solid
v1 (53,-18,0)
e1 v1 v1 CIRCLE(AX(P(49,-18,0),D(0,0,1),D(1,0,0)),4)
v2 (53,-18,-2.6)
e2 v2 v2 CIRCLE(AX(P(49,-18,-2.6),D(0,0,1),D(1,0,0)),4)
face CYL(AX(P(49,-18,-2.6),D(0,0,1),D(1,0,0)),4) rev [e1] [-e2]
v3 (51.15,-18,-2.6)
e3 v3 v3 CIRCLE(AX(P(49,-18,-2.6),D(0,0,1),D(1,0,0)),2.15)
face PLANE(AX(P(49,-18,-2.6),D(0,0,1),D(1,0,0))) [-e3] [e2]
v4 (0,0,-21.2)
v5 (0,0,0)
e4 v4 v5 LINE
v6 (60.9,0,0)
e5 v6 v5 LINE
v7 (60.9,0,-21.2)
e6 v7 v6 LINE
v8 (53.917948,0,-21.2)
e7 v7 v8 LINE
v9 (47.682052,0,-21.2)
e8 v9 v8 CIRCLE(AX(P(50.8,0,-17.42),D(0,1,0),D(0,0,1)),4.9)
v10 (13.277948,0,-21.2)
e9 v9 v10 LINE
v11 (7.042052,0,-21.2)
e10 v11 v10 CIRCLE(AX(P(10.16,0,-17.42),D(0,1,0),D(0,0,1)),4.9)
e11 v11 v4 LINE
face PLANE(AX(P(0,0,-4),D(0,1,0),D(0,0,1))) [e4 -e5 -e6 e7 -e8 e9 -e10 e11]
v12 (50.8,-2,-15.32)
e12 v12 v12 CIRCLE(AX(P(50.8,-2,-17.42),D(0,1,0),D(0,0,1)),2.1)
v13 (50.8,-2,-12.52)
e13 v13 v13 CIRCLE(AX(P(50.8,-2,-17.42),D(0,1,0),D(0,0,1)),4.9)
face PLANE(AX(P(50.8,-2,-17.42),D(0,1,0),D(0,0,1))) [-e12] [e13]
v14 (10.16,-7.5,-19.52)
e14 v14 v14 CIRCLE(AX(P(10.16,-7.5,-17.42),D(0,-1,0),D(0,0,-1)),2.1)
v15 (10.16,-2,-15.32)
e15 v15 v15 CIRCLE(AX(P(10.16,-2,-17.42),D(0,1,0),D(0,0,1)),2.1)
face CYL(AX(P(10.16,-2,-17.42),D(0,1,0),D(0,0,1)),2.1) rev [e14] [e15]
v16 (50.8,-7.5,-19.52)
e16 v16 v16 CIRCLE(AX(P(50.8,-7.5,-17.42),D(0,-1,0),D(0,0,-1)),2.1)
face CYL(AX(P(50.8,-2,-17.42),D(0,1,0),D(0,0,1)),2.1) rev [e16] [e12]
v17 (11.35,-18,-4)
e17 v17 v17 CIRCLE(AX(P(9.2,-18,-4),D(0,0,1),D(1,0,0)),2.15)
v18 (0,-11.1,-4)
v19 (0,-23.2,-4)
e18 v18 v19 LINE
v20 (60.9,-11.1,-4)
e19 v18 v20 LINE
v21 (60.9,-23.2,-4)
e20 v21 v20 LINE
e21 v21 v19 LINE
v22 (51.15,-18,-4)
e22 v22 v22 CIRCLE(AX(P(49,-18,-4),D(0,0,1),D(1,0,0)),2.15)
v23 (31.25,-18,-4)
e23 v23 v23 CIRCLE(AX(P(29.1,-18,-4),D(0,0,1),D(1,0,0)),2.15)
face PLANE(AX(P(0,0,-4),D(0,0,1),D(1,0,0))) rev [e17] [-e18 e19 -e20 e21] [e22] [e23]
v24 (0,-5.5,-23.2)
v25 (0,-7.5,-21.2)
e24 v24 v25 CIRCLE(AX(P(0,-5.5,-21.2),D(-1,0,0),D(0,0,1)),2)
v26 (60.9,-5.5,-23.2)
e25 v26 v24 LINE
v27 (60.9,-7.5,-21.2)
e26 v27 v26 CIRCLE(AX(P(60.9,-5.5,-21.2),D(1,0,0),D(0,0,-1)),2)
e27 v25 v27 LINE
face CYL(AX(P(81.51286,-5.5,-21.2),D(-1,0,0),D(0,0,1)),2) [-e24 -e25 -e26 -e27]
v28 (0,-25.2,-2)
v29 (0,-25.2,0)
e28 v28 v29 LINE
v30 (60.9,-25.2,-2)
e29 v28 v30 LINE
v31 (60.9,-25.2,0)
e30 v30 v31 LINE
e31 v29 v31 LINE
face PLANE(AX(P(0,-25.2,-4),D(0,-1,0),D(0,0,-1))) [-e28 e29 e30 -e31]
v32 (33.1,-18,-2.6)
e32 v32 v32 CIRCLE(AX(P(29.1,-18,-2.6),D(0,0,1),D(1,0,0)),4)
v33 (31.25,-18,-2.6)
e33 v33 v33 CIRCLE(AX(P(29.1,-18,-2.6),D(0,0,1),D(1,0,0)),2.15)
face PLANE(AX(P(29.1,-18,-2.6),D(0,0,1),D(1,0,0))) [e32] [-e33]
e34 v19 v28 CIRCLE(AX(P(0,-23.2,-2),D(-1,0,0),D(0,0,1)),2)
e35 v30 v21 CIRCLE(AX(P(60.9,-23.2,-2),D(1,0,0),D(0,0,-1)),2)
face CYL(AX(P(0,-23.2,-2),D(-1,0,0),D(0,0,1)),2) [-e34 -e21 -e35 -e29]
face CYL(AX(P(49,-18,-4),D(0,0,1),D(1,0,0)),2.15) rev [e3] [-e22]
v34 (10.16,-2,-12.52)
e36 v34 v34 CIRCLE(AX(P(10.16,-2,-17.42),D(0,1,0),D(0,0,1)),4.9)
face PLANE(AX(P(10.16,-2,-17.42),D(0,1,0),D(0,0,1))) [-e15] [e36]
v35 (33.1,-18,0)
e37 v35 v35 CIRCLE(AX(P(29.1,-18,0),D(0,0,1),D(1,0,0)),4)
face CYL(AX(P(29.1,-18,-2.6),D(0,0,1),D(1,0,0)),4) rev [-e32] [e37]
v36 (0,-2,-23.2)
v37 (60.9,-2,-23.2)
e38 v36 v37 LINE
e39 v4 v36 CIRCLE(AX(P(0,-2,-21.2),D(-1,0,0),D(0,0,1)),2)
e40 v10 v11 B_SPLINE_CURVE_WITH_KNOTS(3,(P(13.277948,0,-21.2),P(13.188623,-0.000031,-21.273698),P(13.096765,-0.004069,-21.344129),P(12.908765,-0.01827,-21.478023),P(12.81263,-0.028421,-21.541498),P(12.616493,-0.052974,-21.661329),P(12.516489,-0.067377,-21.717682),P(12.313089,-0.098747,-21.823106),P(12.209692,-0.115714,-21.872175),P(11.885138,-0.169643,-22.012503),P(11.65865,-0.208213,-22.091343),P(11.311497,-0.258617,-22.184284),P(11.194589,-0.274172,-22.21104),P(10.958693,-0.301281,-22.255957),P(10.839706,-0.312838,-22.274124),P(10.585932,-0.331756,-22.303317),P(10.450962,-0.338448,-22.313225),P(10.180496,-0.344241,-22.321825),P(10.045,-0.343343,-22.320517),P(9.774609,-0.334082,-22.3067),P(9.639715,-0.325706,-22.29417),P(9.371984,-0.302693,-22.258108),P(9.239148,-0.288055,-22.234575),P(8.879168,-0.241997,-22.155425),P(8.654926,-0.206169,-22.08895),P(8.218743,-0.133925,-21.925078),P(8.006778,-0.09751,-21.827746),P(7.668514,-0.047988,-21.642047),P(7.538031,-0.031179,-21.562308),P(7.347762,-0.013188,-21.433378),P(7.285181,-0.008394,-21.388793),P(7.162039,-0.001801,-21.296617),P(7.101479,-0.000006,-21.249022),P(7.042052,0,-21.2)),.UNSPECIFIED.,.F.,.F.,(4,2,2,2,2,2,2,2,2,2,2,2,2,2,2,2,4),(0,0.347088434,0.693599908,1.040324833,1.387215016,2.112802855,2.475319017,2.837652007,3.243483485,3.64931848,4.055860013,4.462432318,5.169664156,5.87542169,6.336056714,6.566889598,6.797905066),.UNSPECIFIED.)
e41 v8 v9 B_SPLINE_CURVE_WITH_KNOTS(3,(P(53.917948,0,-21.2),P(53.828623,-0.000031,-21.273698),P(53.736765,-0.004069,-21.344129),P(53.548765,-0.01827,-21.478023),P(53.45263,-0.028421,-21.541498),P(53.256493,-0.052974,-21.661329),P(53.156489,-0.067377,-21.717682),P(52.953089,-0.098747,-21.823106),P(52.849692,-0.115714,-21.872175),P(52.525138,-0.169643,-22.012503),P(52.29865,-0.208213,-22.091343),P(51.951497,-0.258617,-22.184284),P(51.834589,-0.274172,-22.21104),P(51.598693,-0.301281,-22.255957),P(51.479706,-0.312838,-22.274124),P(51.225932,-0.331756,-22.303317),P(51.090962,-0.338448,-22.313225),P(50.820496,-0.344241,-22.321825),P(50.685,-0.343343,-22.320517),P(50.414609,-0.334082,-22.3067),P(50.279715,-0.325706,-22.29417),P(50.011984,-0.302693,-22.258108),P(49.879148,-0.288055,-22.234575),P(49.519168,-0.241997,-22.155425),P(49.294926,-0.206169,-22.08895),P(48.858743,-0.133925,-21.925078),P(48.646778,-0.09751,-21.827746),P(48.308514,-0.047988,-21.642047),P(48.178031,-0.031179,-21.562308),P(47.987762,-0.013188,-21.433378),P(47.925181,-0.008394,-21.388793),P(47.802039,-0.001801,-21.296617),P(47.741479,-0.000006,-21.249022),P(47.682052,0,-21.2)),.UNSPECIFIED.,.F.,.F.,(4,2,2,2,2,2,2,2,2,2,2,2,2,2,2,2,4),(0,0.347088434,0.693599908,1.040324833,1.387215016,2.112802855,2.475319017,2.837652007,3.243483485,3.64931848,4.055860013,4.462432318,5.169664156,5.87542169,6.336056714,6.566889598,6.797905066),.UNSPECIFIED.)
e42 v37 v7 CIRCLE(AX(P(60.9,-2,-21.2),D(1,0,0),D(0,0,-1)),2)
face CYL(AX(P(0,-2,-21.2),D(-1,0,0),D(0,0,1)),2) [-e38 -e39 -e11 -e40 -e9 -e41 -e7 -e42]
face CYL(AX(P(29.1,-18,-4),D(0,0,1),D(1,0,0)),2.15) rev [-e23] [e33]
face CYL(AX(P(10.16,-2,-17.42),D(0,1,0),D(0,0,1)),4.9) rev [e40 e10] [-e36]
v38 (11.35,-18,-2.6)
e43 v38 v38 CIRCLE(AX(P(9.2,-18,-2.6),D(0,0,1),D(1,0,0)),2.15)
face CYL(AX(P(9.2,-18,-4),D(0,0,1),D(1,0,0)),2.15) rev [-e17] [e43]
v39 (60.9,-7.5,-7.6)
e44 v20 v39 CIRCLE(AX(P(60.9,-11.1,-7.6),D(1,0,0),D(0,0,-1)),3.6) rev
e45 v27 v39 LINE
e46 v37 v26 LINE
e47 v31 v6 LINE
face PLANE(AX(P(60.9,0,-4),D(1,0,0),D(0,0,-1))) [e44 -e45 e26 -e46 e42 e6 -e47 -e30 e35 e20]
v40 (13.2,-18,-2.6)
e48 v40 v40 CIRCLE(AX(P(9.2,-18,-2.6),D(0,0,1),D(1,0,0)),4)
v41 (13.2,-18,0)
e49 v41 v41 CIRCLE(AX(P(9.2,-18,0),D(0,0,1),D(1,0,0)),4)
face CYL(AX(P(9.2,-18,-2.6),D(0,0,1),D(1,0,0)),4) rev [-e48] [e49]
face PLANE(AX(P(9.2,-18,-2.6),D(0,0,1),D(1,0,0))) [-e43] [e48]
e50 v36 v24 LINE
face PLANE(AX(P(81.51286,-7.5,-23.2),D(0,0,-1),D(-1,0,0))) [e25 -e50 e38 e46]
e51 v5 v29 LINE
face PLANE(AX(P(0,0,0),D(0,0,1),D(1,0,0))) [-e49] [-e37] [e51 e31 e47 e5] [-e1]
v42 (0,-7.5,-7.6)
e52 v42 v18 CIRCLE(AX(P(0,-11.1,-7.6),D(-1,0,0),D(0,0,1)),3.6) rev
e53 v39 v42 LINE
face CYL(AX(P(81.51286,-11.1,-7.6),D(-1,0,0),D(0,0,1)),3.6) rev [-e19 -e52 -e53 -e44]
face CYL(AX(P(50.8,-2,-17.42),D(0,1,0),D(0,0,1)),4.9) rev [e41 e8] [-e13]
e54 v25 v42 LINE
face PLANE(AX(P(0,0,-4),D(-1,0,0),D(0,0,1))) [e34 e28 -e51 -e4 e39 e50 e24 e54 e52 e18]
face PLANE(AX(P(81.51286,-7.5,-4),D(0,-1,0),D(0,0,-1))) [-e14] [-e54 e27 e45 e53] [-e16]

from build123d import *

# Parameters (mm, degrees)
SKETCH1_W             = 60.9
SKETCH1_H             = 25.2
BOSS_EXTRUDE1_DEPTH   = 4
SKETCH3_R             = 4
SKETCH3_R_2           = 2.15
CUT_EXTRUDE1_DEPTH    = 2.6
SKETCH3_2_R           = 2.15
CUT_EXTRUDE2_DEPTH    = 67.029160225
SKETCH4_W             = 19.2
SKETCH4_H             = 7.5
BOSS_EXTRUDE2_DEPTH   = 60.9
SKETCH5_R             = 4.9
CUT_EXTRUDE3_DEPTH    = 2
M5X0_8_TAPPED_HOLE1_D = 4.2
FILLET1_R             = 2
FILLET2_R             = 3.6


with BuildPart() as part:
    # Sketch1 → Boss-Extrude1 (new body)
    with BuildSketch(Plane.XY):
        with Locations((30.45, -12.6)):
            Rectangle(SKETCH1_W, SKETCH1_H)
    extrude(amount=-BOSS_EXTRUDE1_DEPTH)

    # Sketch3 → Cut-Extrude1 (cut)
    # profile 1 of 3: a face of its own
    with BuildSketch(Plane.XY):
        with Locations((9.2, -18)):
            Circle(SKETCH3_R)
        with Locations((9.2, -18)):
            Circle(SKETCH3_R_2, mode=Mode.SUBTRACT)
    # profile 2 of 3: a face of its own
    with BuildSketch(Plane.XY):
        with Locations((29.1, -18)):
            Circle(SKETCH3_R)
        with Locations((29.1, -18)):
            Circle(SKETCH3_R_2, mode=Mode.SUBTRACT)
    # profile 3 of 3: a face of its own
    with BuildSketch(Plane.XY):
        with Locations((49, -18)):
            Circle(SKETCH3_R)
        with Locations((49, -18)):
            Circle(SKETCH3_R_2, mode=Mode.SUBTRACT)
    extrude(amount=-CUT_EXTRUDE1_DEPTH, mode=Mode.SUBTRACT)

    # Sketch3<2> → Cut-Extrude2 (cut, through all)
    with BuildSketch(Plane.XY):
        with Locations((9.2, -18)):
            Circle(SKETCH3_2_R)
        with Locations((29.1, -18)):
            Circle(SKETCH3_2_R)
        with Locations((49, -18)):
            Circle(SKETCH3_2_R)
    extrude(amount=-CUT_EXTRUDE2_DEPTH, mode=Mode.SUBTRACT)

    # Sketch4 → Boss-Extrude2 (add)
    with BuildSketch(Plane.ZY):
        with Locations((-13.6, -3.75)):
            Rectangle(SKETCH4_W, SKETCH4_H)
    extrude(amount=-BOSS_EXTRUDE2_DEPTH)

    # Sketch5 → Cut-Extrude3 (cut)
    with BuildSketch(Plane(origin=(0, 0, 0), x_dir=(1, 0, 0), z_dir=(0, 1, 0))):
        with Locations(Location((10.16, 17.42, 0), (0, 0, 270))):
            Circle(SKETCH5_R)
        with Locations(Location((50.8, 17.42, 0), (0, 0, 270))):
            Circle(SKETCH5_R)
    extrude(amount=-CUT_EXTRUDE3_DEPTH, mode=Mode.SUBTRACT)

    # M5x0.8 Tapped Hole1 (through all)
    with Locations(Plane(origin=(0, -2, 0), x_dir=(1, 0, 0), z_dir=(0, 1, 0))):
        with Locations((10.16, 17.42), (50.8, 17.42)):
            Hole(M5X0_8_TAPPED_HOLE1_D / 2)

    # Fillet1
    # the kernel refuses this fillet: 2 mm, written as the material it takes off along each edge
    with BuildSketch(Plane(origin=(-5, 0, -23.2), x_dir=(0, 0, 1), z_dir=(1, 0, 0)), Plane(origin=(-5, -7.5, -23.2), x_dir=(0, 1, 0), z_dir=(1, 0, 0)), Plane(origin=(65.9, -25.2, -4), x_dir=(0, 0, 1), z_dir=(-1, 0, 0))) as fillet1_piece_1:
        with BuildLine():
            CenterArc((FILLET1_R, FILLET1_R), FILLET1_R, 180, 90)
            Line((0, FILLET1_R), (0, 0))
            Line((0, 0), (FILLET1_R, 0))
        make_face()
    extrude(amount=70.9, mode=Mode.SUBTRACT)

    # Fillet2
    fillet2_edges = [part.edges().sort_by_distance(p)[0] for p in [
        (30.45, -7.5, -4),
    ]]
    fillet(fillet2_edges, radius=FILLET2_R)


solid = part.part
